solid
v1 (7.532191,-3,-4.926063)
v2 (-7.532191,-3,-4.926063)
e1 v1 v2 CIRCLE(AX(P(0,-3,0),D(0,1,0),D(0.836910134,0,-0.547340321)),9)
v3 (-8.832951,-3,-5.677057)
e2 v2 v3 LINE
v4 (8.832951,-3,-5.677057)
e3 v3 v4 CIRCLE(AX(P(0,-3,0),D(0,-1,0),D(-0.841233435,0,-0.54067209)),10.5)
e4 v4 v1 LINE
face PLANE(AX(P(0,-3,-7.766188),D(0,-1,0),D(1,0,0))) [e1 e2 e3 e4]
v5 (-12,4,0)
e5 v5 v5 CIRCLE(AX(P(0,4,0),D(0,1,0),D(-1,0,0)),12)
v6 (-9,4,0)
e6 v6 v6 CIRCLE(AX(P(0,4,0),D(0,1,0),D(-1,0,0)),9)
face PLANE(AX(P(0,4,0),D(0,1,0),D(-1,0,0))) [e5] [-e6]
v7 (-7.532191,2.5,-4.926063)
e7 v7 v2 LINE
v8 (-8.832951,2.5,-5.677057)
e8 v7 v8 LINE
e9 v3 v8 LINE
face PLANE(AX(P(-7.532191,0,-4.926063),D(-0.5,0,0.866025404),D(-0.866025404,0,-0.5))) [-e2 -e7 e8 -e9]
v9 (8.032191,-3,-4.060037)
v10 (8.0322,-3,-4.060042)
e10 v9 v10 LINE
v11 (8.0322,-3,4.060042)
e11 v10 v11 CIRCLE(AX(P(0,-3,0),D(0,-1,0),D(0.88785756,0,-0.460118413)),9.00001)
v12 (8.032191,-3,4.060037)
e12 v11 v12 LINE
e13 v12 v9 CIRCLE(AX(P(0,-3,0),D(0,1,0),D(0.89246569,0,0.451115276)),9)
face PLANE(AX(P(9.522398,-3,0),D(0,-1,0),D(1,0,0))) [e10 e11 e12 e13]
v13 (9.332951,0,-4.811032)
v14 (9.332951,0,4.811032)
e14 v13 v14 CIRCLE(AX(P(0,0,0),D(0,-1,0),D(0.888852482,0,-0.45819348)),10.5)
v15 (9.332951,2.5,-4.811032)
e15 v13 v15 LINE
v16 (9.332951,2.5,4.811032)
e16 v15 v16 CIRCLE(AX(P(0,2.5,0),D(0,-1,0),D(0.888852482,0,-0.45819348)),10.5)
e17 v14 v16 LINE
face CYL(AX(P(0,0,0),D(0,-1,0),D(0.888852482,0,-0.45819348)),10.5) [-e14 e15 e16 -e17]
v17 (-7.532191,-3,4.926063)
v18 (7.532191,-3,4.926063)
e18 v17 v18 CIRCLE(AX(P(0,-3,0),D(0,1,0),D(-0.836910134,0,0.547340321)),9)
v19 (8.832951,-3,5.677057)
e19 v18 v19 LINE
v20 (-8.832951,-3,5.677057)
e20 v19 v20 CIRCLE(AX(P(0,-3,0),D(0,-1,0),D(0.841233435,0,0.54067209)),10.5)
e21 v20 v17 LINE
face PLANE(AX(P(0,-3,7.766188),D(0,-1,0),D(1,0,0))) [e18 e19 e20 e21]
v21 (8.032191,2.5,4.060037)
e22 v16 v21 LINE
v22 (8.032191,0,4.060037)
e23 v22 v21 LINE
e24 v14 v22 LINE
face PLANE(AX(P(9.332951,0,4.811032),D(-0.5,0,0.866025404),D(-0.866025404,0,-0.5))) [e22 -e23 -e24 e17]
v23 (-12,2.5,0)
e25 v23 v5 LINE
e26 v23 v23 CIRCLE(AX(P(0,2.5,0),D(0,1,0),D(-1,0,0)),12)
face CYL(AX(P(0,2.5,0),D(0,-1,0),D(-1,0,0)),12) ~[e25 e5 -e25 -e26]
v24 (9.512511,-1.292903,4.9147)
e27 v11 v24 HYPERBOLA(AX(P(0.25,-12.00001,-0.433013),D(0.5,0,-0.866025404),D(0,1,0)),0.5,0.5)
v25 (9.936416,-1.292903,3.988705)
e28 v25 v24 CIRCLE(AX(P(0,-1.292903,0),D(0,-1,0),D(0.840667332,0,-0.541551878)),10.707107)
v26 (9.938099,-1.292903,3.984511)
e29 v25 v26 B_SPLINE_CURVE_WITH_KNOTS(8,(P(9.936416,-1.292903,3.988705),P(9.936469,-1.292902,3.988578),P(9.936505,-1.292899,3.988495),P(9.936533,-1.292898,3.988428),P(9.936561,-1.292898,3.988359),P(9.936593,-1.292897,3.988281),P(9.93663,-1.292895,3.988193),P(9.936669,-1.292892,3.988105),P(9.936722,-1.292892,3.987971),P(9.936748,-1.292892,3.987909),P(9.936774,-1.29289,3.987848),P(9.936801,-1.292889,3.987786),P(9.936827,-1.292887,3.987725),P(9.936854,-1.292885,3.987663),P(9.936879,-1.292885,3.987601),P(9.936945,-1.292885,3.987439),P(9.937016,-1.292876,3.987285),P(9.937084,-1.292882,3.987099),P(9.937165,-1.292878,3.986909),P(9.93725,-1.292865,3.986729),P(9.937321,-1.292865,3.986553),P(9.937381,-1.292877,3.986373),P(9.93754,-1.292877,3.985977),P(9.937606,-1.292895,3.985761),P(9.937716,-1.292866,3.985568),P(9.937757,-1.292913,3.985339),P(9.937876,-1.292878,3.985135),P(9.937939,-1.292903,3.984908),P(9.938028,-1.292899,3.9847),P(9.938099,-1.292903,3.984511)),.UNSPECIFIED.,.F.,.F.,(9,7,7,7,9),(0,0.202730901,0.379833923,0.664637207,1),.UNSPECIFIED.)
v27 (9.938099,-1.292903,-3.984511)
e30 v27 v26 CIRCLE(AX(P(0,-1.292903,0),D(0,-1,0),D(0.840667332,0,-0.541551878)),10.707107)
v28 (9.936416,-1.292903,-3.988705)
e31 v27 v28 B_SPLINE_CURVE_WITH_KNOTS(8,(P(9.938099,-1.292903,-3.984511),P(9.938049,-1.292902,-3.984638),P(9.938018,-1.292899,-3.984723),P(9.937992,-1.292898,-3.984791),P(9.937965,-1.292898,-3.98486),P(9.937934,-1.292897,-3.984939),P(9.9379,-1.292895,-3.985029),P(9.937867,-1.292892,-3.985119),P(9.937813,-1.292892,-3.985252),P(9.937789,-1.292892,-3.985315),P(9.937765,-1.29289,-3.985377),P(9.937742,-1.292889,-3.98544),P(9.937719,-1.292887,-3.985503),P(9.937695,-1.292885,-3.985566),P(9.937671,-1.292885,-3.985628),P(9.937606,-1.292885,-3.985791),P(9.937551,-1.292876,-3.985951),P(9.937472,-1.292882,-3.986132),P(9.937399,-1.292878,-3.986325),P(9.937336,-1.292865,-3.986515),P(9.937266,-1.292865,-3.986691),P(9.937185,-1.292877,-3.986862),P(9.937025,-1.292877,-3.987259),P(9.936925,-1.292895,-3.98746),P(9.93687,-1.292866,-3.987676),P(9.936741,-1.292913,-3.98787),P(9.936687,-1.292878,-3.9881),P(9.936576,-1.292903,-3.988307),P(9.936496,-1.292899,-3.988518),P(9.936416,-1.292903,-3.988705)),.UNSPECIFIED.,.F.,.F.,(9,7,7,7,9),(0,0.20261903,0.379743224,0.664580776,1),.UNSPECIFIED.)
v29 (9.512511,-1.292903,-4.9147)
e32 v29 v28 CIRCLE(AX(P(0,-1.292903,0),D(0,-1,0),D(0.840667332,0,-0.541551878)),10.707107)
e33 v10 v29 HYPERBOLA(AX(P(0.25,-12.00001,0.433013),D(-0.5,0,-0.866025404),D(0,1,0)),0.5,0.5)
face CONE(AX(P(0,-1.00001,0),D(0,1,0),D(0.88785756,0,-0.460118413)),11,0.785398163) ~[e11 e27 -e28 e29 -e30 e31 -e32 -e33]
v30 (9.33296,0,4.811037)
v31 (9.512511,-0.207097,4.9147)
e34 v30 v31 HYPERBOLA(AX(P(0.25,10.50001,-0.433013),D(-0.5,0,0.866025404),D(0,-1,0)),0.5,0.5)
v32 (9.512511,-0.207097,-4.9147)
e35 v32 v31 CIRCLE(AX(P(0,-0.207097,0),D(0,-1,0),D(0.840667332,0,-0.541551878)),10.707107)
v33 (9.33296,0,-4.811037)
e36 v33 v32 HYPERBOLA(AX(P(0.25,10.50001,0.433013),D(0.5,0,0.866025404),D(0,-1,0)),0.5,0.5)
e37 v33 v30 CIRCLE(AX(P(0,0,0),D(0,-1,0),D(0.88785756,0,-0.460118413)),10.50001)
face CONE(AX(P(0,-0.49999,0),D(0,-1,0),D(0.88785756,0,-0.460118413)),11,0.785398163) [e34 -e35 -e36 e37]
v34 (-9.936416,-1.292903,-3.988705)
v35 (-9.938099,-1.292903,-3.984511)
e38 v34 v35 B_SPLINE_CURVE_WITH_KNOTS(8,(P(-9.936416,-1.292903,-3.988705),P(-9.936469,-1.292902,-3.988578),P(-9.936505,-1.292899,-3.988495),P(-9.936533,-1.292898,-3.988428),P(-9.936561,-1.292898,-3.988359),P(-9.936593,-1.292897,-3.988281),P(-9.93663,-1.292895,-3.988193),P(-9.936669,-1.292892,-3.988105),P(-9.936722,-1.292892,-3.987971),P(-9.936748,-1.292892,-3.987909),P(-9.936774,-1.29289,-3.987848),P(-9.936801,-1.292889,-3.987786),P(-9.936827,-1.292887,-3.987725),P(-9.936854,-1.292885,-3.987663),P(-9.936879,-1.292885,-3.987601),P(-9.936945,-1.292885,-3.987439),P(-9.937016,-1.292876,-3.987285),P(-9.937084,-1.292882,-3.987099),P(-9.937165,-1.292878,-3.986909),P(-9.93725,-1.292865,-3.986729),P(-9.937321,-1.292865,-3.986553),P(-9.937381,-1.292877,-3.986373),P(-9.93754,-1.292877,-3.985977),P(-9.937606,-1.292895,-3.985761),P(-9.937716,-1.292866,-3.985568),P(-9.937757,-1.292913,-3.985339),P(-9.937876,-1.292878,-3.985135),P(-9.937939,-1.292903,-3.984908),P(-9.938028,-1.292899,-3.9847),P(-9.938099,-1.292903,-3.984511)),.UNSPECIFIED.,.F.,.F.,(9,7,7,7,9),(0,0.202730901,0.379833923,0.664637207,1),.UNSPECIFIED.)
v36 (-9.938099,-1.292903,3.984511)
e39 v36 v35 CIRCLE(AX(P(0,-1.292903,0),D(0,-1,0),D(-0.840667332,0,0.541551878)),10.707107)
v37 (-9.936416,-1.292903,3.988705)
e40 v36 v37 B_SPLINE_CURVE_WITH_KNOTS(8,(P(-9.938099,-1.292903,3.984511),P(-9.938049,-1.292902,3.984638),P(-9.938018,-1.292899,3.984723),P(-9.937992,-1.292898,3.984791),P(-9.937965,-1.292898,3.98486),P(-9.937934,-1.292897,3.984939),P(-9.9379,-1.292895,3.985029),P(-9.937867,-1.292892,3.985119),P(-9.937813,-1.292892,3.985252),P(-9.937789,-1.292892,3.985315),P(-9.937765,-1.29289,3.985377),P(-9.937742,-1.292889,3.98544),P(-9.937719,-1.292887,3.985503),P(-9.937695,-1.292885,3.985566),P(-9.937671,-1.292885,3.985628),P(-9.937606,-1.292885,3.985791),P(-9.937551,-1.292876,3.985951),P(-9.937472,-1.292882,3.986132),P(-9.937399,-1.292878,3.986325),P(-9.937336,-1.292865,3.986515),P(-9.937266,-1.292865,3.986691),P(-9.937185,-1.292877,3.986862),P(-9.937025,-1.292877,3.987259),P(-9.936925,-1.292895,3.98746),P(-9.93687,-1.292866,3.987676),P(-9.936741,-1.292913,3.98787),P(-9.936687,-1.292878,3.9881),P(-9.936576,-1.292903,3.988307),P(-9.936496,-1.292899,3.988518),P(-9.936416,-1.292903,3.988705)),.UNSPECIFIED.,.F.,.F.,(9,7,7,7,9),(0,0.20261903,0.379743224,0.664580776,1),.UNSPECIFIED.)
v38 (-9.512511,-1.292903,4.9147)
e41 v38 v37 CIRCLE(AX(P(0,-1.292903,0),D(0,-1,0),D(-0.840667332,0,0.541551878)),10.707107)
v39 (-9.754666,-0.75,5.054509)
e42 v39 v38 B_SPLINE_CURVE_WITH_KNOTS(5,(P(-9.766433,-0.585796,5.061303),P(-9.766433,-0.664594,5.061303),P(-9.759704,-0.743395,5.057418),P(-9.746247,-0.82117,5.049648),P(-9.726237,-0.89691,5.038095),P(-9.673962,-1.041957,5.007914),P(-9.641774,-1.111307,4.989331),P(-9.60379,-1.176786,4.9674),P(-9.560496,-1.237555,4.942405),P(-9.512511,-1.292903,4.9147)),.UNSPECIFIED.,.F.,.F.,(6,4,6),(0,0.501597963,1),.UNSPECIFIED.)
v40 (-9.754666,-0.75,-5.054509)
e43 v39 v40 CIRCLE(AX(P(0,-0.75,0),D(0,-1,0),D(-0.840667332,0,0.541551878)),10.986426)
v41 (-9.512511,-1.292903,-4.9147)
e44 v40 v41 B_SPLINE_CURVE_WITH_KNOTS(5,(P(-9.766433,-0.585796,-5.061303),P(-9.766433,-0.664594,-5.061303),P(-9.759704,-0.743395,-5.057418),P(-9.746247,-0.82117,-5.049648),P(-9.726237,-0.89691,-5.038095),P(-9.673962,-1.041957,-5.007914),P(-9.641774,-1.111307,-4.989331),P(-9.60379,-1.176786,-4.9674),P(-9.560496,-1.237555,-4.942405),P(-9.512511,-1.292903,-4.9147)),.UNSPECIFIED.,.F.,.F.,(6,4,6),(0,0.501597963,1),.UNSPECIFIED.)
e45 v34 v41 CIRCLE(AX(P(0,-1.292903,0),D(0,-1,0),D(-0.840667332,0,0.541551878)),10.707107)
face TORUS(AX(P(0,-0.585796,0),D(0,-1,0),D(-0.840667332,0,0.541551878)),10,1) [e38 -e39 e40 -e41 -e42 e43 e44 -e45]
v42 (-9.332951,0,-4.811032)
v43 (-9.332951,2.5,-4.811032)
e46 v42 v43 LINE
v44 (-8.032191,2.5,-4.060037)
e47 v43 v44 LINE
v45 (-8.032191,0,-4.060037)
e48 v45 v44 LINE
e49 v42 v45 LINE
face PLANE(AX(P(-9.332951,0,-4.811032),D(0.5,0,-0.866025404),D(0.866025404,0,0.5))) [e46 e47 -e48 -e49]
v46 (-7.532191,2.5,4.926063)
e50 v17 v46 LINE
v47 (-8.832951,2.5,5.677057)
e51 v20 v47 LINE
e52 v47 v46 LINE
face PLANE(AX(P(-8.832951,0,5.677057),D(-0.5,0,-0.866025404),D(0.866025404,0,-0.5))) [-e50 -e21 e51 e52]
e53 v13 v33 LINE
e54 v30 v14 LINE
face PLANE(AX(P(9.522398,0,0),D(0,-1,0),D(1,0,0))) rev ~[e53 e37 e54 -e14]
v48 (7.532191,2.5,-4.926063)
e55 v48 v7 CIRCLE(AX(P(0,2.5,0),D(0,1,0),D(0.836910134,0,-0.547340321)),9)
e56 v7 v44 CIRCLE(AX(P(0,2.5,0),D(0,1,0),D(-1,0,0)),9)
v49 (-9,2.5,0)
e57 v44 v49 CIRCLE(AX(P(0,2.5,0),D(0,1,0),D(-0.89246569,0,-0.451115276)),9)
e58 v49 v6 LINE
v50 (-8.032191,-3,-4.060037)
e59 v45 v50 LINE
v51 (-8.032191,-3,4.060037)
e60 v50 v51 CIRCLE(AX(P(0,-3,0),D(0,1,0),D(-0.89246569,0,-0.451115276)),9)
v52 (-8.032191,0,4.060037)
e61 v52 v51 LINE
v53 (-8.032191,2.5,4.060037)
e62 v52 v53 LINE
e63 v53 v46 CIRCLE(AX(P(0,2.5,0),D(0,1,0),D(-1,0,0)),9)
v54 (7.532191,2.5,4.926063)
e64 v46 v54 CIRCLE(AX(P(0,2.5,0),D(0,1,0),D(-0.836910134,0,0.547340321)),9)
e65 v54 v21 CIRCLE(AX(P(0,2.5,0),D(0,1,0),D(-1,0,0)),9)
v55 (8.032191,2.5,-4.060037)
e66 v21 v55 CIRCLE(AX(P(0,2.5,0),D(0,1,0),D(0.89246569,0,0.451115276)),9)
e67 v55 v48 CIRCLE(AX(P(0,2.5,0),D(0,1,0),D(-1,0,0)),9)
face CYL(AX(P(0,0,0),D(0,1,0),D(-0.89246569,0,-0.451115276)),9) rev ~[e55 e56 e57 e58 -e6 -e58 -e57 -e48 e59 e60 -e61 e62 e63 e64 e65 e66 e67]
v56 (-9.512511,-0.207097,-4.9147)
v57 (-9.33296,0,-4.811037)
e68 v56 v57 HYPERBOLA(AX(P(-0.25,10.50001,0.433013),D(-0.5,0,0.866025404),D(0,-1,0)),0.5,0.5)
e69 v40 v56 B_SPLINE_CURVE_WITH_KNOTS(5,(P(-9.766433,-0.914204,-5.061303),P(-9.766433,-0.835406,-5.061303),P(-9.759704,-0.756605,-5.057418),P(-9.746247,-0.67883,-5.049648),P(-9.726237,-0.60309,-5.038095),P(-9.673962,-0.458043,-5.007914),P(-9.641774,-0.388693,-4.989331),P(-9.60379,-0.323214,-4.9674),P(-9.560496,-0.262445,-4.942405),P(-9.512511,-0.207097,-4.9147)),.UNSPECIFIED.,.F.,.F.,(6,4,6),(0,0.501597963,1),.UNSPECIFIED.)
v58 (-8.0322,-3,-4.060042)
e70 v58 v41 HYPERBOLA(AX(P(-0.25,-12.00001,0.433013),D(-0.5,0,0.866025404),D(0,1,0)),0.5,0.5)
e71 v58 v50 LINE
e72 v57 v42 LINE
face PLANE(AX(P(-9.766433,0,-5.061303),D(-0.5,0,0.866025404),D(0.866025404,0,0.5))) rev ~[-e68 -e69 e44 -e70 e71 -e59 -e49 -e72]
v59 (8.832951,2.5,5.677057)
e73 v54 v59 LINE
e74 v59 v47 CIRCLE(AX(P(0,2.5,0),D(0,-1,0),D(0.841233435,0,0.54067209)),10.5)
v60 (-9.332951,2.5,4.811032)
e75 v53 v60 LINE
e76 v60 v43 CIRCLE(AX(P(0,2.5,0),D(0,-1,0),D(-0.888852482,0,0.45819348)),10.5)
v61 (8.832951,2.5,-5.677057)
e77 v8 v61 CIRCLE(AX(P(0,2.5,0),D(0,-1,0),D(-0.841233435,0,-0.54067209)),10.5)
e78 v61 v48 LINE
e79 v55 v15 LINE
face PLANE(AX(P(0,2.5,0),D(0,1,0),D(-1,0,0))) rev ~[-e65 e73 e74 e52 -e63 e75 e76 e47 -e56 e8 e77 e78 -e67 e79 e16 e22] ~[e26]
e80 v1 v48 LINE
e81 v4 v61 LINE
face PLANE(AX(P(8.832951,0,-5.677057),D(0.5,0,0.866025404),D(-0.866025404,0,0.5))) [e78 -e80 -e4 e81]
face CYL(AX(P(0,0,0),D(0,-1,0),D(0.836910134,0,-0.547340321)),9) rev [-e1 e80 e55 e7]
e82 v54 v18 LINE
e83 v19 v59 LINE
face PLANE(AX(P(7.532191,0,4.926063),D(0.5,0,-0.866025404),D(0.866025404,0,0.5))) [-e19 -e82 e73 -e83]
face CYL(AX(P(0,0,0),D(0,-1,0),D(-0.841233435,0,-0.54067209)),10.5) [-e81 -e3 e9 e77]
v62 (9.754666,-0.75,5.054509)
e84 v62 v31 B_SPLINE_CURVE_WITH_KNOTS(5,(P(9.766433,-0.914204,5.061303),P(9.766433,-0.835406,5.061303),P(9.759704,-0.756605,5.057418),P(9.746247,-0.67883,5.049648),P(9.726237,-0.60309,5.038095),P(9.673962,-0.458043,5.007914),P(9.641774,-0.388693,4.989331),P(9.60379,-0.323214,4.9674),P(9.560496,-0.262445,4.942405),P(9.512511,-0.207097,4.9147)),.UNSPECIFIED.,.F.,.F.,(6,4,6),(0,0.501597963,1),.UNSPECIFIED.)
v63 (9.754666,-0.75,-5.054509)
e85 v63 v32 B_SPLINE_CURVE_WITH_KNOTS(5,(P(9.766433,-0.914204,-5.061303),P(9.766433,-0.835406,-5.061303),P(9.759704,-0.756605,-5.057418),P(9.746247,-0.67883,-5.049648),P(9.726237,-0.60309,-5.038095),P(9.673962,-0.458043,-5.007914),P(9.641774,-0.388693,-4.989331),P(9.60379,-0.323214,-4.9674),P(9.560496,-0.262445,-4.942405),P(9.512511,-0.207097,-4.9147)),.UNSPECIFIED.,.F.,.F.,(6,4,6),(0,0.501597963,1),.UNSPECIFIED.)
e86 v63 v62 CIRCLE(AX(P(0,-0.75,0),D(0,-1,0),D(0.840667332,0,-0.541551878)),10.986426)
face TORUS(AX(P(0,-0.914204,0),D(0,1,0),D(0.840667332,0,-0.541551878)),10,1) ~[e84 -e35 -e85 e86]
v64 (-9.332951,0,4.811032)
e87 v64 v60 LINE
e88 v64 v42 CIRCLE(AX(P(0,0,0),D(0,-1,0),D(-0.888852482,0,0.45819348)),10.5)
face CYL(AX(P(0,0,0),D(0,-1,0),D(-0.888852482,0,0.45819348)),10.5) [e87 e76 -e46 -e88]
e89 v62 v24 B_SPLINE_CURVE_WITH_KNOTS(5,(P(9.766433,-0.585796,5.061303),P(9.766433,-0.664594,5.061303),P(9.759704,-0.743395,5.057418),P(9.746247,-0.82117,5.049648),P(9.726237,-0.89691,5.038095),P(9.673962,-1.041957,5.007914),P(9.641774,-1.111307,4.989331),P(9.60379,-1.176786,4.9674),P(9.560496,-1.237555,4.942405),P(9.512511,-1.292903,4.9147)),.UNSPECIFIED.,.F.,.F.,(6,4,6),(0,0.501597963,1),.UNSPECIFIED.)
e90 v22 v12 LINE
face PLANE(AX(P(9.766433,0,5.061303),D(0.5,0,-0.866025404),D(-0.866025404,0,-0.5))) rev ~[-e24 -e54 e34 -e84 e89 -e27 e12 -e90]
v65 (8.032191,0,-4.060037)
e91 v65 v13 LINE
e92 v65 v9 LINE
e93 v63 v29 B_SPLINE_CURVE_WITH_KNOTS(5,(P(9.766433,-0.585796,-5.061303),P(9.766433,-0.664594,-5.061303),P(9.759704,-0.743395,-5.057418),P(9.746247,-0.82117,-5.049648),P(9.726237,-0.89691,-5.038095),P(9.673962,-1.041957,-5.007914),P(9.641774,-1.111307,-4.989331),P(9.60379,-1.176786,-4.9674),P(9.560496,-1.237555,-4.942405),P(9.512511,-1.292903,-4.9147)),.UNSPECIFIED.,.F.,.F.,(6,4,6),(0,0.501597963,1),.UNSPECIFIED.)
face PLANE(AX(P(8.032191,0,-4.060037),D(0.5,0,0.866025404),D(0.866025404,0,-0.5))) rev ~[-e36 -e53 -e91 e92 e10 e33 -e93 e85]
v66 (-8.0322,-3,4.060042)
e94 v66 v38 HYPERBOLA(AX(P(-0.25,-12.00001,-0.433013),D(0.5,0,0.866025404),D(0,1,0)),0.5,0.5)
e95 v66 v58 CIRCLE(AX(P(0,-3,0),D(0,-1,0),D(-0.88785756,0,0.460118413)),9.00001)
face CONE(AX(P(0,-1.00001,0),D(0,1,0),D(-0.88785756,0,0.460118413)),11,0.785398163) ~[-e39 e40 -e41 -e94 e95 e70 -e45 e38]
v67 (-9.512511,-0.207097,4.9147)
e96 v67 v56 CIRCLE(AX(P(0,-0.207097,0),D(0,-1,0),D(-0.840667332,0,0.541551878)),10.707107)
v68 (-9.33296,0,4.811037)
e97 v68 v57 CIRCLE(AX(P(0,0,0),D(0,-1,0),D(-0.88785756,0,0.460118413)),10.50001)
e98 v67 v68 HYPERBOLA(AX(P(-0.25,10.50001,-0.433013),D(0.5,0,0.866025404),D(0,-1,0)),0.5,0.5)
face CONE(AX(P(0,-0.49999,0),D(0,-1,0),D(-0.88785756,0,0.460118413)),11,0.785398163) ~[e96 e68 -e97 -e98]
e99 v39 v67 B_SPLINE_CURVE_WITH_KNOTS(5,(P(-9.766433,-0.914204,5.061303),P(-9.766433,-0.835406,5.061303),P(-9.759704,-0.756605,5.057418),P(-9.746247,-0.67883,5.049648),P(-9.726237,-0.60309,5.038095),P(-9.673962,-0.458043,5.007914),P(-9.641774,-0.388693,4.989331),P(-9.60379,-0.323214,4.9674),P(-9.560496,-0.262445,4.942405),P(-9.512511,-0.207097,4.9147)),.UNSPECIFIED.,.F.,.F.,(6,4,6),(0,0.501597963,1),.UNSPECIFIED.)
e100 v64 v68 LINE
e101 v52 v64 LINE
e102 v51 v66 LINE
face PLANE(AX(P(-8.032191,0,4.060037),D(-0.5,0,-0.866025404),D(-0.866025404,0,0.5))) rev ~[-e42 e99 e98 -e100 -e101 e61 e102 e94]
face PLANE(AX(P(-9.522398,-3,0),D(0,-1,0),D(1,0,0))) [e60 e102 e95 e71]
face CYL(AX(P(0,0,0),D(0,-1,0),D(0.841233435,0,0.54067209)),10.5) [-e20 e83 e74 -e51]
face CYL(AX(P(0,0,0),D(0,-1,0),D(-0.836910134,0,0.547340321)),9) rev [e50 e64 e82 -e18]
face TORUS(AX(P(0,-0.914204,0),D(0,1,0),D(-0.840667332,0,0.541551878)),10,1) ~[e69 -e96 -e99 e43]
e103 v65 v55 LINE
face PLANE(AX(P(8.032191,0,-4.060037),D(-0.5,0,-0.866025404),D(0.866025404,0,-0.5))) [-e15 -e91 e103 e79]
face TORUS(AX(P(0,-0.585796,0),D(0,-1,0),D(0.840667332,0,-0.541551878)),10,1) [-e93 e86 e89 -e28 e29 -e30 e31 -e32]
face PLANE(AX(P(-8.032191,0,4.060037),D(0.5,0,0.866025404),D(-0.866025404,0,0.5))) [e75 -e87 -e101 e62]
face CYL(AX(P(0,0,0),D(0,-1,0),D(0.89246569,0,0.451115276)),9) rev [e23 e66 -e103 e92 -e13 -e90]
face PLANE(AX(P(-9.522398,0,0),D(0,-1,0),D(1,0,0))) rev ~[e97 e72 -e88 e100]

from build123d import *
from build123d import SkipClean  # not in build123d's __all__

# Parameters (mm, degrees)
F1_DEPTH     = 2.5
F2_R         = 12
F2_R_2       = 9
F3_DEPTH     = 1.5
F5_DEPTH     = 3
F6_SIZE      = 1.99999
F7_SIZE      = 0.49999
F8_T3_ANGLE  = 65.5786890643
F8_T6_ANGLE  = 65.5786890643
F8_T9_ANGLE  = 65.5786890643
F8_T12_ANGLE = 65.5786890643


# Not quite as in the source:
# - a fillet or chamfer that OpenCascade refuses, or shapes differently, is made with other operations: its cross-section is extruded or revolved along the edge and cut away or added
# - a fillet or chamfer is up to 0.001 mm smaller than in the source, because OpenCascade refuses the exact size


with BuildPart() as f1:
    # F0 (on Front) → F1 (new body)
    with BuildSketch(Plane.XZ):
        with BuildLine():
            Line((-8.0321912081, 4.060037487), (-9.3329510623, 4.811031539))
            ThreePointArc((-9.3329510623, 4.811031539), (-10.5, 0), (-9.3329510623, -4.811031539))
            Line((-9.3329510623, -4.811031539), (-8.0321912081, -4.060037487))
            ThreePointArc((-8.0321912081, -4.060037487), (-9, 0), (-8.0321912081, 4.060037487))
        make_face()
    extrude(amount=-F1_DEPTH)



with BuildPart() as f1b:
    # F0 (on Front) → F1, piece 2 (new body)
    with BuildSketch(Plane.XZ):
        with BuildLine():
            ThreePointArc((8.8329510623, 5.6770569427), (0, 10.5), (-8.8329510623, 5.6770569427))
            Line((-8.8329510623, 5.6770569427), (-7.5321912081, 4.9260628908))
            ThreePointArc((-7.5321912081, 4.9260628908), (0, 9), (7.5321912081, 4.9260628908))
            Line((7.5321912081, 4.9260628908), (8.8329510623, 5.6770569427))
        make_face()
    extrude(amount=-F1_DEPTH)


with BuildPart() as f1c:
    # F0 (on Front) → F1, piece 3 (new body)
    with BuildSketch(Plane.XZ):
        with BuildLine():
            Line((8.0321912081, -4.060037487), (9.3329510623, -4.811031539))
            ThreePointArc((9.3329510623, -4.811031539), (10.5, 0), (9.3329510623, 4.811031539))
            Line((9.3329510623, 4.811031539), (8.0321912081, 4.060037487))
            ThreePointArc((8.0321912081, 4.060037487), (9, 0), (8.0321912081, -4.060037487))
        make_face()
    extrude(amount=-F1_DEPTH)


with BuildPart() as f1d:
    # F0 (on Front) → F1, piece 4 (new body)
    with BuildSketch(Plane.XZ):
        with BuildLine():
            Line((-7.5321912081, -4.9260628908), (-8.8329510623, -5.6770569427))
            ThreePointArc((-8.8329510623, -5.6770569427), (0, -10.5), (8.8329510623, -5.6770569427))
            Line((8.8329510623, -5.6770569427), (7.5321912081, -4.9260628908))
            ThreePointArc((7.5321912081, -4.9260628908), (0, -9), (-7.5321912081, -4.9260628908))
        make_face()
    extrude(amount=-F1_DEPTH)


with BuildPart() as f1_1:
    add(f1.part, clean=False)

    add(f1b.part)  # F3 merges F1b

    add(f1c.part)  # F3 merges F1c

    add(f1d.part)  # F3 merges F1d
    # F2 (on face) → F3 (join)
    with BuildSketch(Plane(origin=(0, 2.5, 0), x_dir=(-1, 0, 0), z_dir=(0, 1, 0))):
        Circle(F2_R)
        Circle(F2_R_2, mode=Mode.SUBTRACT)
    extrude(amount=F3_DEPTH)

    # F4 (on face) → F5 (join)
    with BuildSketch(Plane.XZ):
        with BuildLine():
            ThreePointArc((-7.5321912081, 4.9260628908), (0, 9), (7.5321912081, 4.9260628908))
            Line((7.5321912081, 4.9260628908), (8.8329510623, 5.6770569427))
            ThreePointArc((8.8329510623, 5.6770569427), (0, 10.5), (-8.8329510623, 5.6770569427))
            Line((-8.8329510623, 5.6770569427), (-7.5321912081, 4.9260628908))
        make_face()
        with BuildLine():
            Line((8.0321912081, -4.060037487), (9.7664331553, -5.0613025421))
            ThreePointArc((9.7664331553, -5.0613025421), (11, 0), (9.7664331553, 5.0613025421))
            Line((9.7664331553, 5.0613025421), (8.0321912081, 4.060037487))
            ThreePointArc((8.0321912081, 4.060037487), (9, 0), (8.0321912081, -4.060037487))
        make_face()
        with BuildLine():
            Line((-8.0321912081, 4.060037487), (-9.7664331553, 5.0613025421))
            ThreePointArc((-9.7664331553, 5.0613025421), (-11, 0), (-9.7664331553, -5.0613025421))
            Line((-9.7664331553, -5.0613025421), (-8.0321912081, -4.060037487))
            ThreePointArc((-8.0321912081, -4.060037487), (-9, 0), (-8.0321912081, 4.060037487))
        make_face()
        with BuildLine():
            Line((-7.5321912081, -4.9260628908), (-8.8329510623, -5.6770569427))
            ThreePointArc((-8.8329510623, -5.6770569427), (0, -10.5), (8.8329510623, -5.6770569427))
            Line((8.8329510623, -5.6770569427), (7.5321912081, -4.9260628908))
            ThreePointArc((7.5321912081, -4.9260628908), (0, -9), (-7.5321912081, -4.9260628908))
        make_face()
    with SkipClean():  # cleaning this boolean's faces spoils the solid; the shape is the same uncleaned
        extrude(amount=F5_DEPTH)

    # F6 (size 2 in the source; OpenCascade refuses exactly that, so slightly less here)
    f6_edges = [f1_1.edges().sort_by_distance(p)[0] for p in [
        (-11, -3, 0),
        (11, -3, 0),
    ]]
    chamfer(f6_edges, length=F6_SIZE)

    # F7 (size 0.5 in the source; OpenCascade refuses exactly that, so slightly less here)
    f7_edges = [f1_1.edges().sort_by_distance(p)[0] for p in [
        (-11, 0, 0),
        (11, 0, 0),
    ]]
    chamfer(f7_edges, length=F7_SIZE)

    # F8: fillet of radius 1 on 4 edges, made by hand


with BuildPart() as f8_tool1:
    # F8_s2 → F8_t3 (revolve)
    with BuildSketch(Plane(origin=(0, 0, 0), x_dir=(0, 1, 0), z_dir=(0.5415518782, 0, 0.8406673321))):
        with BuildLine():
            ThreePointArc((-0.5857964376, 11), (-0.96847987, 10.9238795325), (-1.2929032188, 10.7071067812))
            Line((-1.2929032188, 10.7071067812), (-1.00001, 11))
            Line((-1.00001, 11), (-0.5857964376, 11))
        make_face()
    revolve(axis=Axis((0, -1.00001, 0), (0, -1, 0)), revolution_arc=F8_T3_ANGLE)


with BuildPart() as f8_tool4:
    # F8_s5 → F8_t6 (revolve)
    with BuildSketch(Plane(origin=(0, 0, 0), x_dir=(0, 1, 0), z_dir=(0.5415518782, 0, 0.8406673321))):
        with BuildLine():
            ThreePointArc((-0.9142035624, 11), (-0.53152013, 10.9238795325), (-0.2070967812, 10.7071067812))
            Line((-0.2070967812, 10.7071067812), (-0.49999, 11))
            Line((-0.49999, 11), (-0.9142035624, 11))
        make_face()
    revolve(axis=Axis((0, -0.49999, 0), (0, -1, 0)), revolution_arc=F8_T6_ANGLE)


with BuildPart() as f8_tool7:
    # F8_s8 → F8_t9 (revolve)
    with BuildSketch(Plane(origin=(0, 0, 0), x_dir=(0, 1, 0), z_dir=(-0.5415518782, 0, -0.8406673321))):
        with BuildLine():
            ThreePointArc((-0.5857964376, 11), (-0.96847987, 10.9238795325), (-1.2929032188, 10.7071067812))
            Line((-1.2929032188, 10.7071067812), (-1.00001, 11))
            Line((-1.00001, 11), (-0.5857964376, 11))
        make_face()
    revolve(axis=Axis((0, -1.00001, 0), (0, -1, 0)), revolution_arc=F8_T9_ANGLE)


with BuildPart() as f8_tool10:
    # F8_s11 → F8_t12 (revolve)
    with BuildSketch(Plane(origin=(0, 0, 0), x_dir=(0, 1, 0), z_dir=(-0.5415518782, 0, -0.8406673321))):
        with BuildLine():
            ThreePointArc((-0.9142035624, 11), (-0.53152013, 10.9238795325), (-0.2070967812, 10.7071067812))
            Line((-0.2070967812, 10.7071067812), (-0.49999, 11))
            Line((-0.49999, 11), (-0.9142035624, 11))
        make_face()
    revolve(axis=Axis((0, -0.49999, 0), (0, -1, 0)), revolution_arc=F8_T12_ANGLE)


with BuildPart() as f1_2:
    add(f1_1.part, clean=False)

    # F8_t13: cut F8_tool1, F8_tool4, F8_tool7, F8_tool10
    add([f8_tool1.part, f8_tool4.part, f8_tool7.part, f8_tool10.part], mode=Mode.SUBTRACT)


solid = f1_2.part
